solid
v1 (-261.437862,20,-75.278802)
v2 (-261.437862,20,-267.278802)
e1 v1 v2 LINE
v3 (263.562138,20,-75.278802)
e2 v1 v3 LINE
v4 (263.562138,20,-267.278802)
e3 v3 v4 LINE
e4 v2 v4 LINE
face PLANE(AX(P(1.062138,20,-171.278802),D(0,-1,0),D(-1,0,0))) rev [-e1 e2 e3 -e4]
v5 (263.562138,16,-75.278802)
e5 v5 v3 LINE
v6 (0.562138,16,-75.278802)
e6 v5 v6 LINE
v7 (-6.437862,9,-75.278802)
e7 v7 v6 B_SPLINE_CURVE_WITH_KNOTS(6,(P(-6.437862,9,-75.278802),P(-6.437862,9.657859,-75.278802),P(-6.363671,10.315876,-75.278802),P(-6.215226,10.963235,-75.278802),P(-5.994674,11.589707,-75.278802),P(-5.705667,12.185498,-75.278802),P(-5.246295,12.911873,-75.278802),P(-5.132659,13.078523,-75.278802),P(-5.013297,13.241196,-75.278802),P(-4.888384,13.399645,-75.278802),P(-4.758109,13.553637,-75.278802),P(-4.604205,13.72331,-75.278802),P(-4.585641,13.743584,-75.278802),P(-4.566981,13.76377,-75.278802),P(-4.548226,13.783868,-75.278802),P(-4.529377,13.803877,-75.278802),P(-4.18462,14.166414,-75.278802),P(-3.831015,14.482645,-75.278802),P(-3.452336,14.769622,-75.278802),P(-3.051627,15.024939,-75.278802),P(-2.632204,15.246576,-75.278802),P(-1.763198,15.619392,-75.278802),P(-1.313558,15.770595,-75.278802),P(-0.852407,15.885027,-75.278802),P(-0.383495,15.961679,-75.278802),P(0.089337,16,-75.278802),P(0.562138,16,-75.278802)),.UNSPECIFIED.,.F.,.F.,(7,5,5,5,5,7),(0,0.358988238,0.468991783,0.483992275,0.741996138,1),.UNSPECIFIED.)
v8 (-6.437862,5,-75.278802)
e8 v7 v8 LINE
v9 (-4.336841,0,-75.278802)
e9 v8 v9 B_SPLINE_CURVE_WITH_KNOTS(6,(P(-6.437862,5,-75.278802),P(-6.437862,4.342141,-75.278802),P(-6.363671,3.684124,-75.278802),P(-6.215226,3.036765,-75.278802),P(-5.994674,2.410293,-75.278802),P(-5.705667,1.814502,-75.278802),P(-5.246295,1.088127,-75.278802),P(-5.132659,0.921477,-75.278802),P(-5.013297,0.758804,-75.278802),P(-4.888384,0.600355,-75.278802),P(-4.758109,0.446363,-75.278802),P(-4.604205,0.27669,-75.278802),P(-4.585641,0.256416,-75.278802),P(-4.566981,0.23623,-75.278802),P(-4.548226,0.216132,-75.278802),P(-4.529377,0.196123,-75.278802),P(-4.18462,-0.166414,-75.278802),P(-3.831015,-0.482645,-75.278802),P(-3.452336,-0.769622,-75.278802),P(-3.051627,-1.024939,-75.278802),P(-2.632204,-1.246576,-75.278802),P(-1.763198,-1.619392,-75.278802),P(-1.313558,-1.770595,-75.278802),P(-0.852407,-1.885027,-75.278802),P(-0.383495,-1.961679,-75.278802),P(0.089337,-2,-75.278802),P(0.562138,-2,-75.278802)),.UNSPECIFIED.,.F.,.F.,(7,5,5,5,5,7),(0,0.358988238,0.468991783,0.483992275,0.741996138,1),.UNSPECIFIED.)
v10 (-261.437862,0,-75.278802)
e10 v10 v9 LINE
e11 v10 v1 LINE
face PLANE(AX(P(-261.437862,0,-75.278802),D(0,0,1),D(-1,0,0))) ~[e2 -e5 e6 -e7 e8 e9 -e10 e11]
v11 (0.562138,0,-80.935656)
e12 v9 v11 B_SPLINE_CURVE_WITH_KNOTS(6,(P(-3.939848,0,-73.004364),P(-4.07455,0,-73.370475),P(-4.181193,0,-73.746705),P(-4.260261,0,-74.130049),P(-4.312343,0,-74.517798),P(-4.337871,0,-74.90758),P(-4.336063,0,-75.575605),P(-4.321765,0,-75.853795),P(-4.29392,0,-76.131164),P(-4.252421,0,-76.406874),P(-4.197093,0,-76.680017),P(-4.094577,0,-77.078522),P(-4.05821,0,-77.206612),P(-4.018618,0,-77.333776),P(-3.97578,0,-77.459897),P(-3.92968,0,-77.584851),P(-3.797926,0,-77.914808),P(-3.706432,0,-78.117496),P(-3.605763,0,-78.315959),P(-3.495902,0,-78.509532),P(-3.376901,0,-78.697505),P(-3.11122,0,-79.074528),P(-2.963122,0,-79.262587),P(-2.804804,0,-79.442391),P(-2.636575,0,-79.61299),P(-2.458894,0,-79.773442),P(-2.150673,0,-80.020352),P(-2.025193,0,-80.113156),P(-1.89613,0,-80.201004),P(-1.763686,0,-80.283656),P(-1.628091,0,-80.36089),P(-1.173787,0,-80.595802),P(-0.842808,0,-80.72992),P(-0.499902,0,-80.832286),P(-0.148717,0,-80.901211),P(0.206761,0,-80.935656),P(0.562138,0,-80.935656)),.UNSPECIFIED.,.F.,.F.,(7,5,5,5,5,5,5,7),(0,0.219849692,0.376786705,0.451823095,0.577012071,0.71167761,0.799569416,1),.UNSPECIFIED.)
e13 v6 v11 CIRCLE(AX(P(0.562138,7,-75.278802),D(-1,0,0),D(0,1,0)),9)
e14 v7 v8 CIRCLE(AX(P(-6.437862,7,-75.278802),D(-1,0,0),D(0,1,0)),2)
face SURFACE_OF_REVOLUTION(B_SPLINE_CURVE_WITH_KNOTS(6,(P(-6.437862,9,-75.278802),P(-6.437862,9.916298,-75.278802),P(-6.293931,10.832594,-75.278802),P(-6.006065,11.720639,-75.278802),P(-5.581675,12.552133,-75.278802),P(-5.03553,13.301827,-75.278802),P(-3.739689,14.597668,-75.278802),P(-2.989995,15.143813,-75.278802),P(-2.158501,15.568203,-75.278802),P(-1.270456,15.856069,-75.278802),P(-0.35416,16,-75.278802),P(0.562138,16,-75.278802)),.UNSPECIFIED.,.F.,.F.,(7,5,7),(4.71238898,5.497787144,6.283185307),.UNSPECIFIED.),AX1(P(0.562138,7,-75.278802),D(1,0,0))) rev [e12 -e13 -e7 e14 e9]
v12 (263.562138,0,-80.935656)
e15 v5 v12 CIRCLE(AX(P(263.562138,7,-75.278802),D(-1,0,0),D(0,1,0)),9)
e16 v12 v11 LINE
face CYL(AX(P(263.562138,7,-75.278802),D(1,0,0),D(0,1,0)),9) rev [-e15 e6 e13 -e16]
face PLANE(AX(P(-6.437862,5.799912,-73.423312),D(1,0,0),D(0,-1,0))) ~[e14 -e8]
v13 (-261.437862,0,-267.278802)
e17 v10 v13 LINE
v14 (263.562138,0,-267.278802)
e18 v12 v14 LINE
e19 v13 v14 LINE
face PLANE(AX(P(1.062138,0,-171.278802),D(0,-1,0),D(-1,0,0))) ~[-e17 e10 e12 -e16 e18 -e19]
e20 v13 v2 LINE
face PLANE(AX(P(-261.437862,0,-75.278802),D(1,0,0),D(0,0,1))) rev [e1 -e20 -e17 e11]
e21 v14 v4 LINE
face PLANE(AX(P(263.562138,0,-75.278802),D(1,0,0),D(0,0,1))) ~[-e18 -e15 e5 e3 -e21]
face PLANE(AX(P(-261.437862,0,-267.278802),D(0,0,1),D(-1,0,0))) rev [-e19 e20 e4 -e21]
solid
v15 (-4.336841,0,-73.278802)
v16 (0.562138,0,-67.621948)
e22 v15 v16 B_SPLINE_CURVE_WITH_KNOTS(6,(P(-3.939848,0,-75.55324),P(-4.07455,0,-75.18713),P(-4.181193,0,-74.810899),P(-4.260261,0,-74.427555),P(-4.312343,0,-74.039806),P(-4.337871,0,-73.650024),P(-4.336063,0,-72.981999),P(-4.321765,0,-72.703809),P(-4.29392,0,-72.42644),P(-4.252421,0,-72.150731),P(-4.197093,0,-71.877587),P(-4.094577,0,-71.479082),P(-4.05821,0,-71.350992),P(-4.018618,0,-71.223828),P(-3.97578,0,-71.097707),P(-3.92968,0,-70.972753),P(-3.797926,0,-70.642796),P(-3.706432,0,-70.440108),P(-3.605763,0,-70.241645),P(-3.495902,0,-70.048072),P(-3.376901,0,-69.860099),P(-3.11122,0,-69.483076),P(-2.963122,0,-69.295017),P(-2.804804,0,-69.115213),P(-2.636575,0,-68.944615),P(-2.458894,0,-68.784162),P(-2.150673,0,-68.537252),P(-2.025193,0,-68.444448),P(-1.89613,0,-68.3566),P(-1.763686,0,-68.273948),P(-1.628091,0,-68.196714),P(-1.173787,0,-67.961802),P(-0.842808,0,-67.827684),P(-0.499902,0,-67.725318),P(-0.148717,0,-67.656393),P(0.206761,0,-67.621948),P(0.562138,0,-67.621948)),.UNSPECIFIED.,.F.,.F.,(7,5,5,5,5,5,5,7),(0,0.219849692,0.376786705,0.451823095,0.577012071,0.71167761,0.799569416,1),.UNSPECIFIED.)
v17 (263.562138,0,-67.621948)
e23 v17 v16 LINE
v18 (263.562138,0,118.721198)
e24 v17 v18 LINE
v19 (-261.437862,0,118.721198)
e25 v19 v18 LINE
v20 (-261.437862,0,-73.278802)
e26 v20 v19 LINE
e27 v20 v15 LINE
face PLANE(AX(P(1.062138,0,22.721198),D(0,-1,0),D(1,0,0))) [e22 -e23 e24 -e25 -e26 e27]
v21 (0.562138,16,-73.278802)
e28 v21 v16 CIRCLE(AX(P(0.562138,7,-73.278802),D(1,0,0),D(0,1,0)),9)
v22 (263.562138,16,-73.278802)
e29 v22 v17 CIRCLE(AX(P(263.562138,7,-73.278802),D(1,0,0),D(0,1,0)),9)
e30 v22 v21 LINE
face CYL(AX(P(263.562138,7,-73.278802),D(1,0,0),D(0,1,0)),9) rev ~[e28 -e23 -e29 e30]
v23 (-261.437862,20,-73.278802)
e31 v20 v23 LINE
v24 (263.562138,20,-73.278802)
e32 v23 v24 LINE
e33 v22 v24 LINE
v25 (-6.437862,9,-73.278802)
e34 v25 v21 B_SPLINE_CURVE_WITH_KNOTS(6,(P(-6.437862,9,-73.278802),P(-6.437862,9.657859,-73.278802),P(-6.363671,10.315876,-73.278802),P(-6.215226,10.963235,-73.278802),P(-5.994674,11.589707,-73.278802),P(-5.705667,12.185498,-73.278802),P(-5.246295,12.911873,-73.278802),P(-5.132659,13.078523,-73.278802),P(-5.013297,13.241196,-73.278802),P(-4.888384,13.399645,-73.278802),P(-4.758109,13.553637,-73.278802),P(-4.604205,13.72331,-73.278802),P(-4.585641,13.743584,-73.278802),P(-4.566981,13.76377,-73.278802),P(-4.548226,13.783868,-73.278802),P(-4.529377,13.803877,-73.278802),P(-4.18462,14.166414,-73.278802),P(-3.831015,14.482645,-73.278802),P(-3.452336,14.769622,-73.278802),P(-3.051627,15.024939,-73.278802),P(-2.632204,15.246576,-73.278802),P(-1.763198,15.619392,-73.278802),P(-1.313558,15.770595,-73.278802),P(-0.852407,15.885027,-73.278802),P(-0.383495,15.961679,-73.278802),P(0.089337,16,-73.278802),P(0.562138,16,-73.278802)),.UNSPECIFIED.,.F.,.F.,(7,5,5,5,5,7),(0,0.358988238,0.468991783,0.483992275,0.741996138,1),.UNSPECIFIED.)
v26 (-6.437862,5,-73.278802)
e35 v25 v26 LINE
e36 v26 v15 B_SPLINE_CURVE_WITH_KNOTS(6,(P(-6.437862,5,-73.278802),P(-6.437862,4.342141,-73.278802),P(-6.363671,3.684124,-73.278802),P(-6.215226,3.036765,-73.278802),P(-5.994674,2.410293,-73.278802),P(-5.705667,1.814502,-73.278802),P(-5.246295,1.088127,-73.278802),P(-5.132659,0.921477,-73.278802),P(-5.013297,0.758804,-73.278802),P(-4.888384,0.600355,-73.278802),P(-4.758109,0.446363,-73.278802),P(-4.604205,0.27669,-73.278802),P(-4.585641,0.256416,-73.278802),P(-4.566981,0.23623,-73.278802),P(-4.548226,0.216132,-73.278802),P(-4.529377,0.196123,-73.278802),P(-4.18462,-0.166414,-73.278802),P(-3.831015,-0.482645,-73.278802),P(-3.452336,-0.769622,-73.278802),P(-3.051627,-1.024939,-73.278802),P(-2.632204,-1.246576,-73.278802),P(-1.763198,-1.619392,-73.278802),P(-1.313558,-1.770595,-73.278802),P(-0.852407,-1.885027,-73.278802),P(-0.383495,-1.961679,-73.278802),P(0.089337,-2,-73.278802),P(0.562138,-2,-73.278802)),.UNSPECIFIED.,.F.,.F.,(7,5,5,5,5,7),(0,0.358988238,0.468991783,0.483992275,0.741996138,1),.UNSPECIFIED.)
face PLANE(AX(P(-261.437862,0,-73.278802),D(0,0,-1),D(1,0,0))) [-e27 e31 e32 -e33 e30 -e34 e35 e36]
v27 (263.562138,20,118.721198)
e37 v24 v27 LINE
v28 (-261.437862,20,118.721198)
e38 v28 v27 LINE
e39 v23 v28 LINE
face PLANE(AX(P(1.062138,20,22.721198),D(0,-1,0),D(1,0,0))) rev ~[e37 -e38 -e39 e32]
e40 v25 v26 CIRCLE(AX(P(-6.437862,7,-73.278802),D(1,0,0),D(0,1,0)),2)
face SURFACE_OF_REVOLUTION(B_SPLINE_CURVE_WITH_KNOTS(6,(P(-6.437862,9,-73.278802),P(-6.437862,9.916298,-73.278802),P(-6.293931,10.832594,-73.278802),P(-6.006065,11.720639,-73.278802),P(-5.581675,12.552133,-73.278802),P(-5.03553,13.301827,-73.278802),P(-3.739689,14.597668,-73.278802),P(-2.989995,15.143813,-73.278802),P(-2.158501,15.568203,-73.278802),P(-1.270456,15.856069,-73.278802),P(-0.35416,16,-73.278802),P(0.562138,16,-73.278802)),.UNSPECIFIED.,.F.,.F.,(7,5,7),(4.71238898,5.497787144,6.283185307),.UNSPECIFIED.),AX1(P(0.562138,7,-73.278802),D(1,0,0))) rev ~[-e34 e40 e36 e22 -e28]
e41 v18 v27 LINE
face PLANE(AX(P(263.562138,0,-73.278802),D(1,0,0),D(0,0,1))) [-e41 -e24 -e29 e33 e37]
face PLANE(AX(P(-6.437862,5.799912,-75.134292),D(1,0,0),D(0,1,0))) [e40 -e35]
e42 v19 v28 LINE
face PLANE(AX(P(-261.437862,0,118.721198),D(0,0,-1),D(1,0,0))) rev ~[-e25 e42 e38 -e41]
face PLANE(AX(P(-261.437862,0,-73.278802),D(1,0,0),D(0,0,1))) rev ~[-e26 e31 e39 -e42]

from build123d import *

# Parameters (mm, degrees)
F0_W     = 525
F0_H     = 192
F1_DEPTH = 20
F3_DEPTH = 270
F4_R     = 7


with BuildPart() as f1:
    # F0 (on Front) → F1 (new body)
    with BuildSketch(Plane.XZ):
        with Locations((1.0621380061, 22.721197979)):
            Rectangle(F0_W, F0_H)
    extrude(amount=-F1_DEPTH)

    # F2 (on face) → F3 (cut)
    with BuildSketch(Plane.YZ.offset(263.5621380061)):
        with BuildLine():
            ThreePointArc((0, -67.6219477715), (4, -81.7640833952), (16, -73.278802021))
            Line((16, -73.278802021), (0, -73.278802021))
            Line((0, -73.278802021), (0, -67.6219477715))
        make_face()
        with BuildLine():
            Line((0, -73.278802021), (16, -73.278802021))
            ThreePointArc((16, -73.278802021), (10, -64.7935206468), (0, -67.6219477715))
            Line((0, -67.6219477715), (0, -73.278802021))
        make_face()
    extrude(amount=-F3_DEPTH, mode=Mode.SUBTRACT)

    # F4
    f4_edges = [f1.edges().sort_by_distance(p)[0] for p in [
        (-6.437862, 10, -64.793521),
    ]]
    fillet(f4_edges, radius=F4_R)


with BuildPart() as f7_1:
    # F7: instance of F1
    add(f1.part.mirror(Plane(origin=(-53.484370932, 25, -74.278802021), x_dir=(1, 0, 0), z_dir=(0, 0, 1))))


solid = Compound([f1.part, f7_1.part])
